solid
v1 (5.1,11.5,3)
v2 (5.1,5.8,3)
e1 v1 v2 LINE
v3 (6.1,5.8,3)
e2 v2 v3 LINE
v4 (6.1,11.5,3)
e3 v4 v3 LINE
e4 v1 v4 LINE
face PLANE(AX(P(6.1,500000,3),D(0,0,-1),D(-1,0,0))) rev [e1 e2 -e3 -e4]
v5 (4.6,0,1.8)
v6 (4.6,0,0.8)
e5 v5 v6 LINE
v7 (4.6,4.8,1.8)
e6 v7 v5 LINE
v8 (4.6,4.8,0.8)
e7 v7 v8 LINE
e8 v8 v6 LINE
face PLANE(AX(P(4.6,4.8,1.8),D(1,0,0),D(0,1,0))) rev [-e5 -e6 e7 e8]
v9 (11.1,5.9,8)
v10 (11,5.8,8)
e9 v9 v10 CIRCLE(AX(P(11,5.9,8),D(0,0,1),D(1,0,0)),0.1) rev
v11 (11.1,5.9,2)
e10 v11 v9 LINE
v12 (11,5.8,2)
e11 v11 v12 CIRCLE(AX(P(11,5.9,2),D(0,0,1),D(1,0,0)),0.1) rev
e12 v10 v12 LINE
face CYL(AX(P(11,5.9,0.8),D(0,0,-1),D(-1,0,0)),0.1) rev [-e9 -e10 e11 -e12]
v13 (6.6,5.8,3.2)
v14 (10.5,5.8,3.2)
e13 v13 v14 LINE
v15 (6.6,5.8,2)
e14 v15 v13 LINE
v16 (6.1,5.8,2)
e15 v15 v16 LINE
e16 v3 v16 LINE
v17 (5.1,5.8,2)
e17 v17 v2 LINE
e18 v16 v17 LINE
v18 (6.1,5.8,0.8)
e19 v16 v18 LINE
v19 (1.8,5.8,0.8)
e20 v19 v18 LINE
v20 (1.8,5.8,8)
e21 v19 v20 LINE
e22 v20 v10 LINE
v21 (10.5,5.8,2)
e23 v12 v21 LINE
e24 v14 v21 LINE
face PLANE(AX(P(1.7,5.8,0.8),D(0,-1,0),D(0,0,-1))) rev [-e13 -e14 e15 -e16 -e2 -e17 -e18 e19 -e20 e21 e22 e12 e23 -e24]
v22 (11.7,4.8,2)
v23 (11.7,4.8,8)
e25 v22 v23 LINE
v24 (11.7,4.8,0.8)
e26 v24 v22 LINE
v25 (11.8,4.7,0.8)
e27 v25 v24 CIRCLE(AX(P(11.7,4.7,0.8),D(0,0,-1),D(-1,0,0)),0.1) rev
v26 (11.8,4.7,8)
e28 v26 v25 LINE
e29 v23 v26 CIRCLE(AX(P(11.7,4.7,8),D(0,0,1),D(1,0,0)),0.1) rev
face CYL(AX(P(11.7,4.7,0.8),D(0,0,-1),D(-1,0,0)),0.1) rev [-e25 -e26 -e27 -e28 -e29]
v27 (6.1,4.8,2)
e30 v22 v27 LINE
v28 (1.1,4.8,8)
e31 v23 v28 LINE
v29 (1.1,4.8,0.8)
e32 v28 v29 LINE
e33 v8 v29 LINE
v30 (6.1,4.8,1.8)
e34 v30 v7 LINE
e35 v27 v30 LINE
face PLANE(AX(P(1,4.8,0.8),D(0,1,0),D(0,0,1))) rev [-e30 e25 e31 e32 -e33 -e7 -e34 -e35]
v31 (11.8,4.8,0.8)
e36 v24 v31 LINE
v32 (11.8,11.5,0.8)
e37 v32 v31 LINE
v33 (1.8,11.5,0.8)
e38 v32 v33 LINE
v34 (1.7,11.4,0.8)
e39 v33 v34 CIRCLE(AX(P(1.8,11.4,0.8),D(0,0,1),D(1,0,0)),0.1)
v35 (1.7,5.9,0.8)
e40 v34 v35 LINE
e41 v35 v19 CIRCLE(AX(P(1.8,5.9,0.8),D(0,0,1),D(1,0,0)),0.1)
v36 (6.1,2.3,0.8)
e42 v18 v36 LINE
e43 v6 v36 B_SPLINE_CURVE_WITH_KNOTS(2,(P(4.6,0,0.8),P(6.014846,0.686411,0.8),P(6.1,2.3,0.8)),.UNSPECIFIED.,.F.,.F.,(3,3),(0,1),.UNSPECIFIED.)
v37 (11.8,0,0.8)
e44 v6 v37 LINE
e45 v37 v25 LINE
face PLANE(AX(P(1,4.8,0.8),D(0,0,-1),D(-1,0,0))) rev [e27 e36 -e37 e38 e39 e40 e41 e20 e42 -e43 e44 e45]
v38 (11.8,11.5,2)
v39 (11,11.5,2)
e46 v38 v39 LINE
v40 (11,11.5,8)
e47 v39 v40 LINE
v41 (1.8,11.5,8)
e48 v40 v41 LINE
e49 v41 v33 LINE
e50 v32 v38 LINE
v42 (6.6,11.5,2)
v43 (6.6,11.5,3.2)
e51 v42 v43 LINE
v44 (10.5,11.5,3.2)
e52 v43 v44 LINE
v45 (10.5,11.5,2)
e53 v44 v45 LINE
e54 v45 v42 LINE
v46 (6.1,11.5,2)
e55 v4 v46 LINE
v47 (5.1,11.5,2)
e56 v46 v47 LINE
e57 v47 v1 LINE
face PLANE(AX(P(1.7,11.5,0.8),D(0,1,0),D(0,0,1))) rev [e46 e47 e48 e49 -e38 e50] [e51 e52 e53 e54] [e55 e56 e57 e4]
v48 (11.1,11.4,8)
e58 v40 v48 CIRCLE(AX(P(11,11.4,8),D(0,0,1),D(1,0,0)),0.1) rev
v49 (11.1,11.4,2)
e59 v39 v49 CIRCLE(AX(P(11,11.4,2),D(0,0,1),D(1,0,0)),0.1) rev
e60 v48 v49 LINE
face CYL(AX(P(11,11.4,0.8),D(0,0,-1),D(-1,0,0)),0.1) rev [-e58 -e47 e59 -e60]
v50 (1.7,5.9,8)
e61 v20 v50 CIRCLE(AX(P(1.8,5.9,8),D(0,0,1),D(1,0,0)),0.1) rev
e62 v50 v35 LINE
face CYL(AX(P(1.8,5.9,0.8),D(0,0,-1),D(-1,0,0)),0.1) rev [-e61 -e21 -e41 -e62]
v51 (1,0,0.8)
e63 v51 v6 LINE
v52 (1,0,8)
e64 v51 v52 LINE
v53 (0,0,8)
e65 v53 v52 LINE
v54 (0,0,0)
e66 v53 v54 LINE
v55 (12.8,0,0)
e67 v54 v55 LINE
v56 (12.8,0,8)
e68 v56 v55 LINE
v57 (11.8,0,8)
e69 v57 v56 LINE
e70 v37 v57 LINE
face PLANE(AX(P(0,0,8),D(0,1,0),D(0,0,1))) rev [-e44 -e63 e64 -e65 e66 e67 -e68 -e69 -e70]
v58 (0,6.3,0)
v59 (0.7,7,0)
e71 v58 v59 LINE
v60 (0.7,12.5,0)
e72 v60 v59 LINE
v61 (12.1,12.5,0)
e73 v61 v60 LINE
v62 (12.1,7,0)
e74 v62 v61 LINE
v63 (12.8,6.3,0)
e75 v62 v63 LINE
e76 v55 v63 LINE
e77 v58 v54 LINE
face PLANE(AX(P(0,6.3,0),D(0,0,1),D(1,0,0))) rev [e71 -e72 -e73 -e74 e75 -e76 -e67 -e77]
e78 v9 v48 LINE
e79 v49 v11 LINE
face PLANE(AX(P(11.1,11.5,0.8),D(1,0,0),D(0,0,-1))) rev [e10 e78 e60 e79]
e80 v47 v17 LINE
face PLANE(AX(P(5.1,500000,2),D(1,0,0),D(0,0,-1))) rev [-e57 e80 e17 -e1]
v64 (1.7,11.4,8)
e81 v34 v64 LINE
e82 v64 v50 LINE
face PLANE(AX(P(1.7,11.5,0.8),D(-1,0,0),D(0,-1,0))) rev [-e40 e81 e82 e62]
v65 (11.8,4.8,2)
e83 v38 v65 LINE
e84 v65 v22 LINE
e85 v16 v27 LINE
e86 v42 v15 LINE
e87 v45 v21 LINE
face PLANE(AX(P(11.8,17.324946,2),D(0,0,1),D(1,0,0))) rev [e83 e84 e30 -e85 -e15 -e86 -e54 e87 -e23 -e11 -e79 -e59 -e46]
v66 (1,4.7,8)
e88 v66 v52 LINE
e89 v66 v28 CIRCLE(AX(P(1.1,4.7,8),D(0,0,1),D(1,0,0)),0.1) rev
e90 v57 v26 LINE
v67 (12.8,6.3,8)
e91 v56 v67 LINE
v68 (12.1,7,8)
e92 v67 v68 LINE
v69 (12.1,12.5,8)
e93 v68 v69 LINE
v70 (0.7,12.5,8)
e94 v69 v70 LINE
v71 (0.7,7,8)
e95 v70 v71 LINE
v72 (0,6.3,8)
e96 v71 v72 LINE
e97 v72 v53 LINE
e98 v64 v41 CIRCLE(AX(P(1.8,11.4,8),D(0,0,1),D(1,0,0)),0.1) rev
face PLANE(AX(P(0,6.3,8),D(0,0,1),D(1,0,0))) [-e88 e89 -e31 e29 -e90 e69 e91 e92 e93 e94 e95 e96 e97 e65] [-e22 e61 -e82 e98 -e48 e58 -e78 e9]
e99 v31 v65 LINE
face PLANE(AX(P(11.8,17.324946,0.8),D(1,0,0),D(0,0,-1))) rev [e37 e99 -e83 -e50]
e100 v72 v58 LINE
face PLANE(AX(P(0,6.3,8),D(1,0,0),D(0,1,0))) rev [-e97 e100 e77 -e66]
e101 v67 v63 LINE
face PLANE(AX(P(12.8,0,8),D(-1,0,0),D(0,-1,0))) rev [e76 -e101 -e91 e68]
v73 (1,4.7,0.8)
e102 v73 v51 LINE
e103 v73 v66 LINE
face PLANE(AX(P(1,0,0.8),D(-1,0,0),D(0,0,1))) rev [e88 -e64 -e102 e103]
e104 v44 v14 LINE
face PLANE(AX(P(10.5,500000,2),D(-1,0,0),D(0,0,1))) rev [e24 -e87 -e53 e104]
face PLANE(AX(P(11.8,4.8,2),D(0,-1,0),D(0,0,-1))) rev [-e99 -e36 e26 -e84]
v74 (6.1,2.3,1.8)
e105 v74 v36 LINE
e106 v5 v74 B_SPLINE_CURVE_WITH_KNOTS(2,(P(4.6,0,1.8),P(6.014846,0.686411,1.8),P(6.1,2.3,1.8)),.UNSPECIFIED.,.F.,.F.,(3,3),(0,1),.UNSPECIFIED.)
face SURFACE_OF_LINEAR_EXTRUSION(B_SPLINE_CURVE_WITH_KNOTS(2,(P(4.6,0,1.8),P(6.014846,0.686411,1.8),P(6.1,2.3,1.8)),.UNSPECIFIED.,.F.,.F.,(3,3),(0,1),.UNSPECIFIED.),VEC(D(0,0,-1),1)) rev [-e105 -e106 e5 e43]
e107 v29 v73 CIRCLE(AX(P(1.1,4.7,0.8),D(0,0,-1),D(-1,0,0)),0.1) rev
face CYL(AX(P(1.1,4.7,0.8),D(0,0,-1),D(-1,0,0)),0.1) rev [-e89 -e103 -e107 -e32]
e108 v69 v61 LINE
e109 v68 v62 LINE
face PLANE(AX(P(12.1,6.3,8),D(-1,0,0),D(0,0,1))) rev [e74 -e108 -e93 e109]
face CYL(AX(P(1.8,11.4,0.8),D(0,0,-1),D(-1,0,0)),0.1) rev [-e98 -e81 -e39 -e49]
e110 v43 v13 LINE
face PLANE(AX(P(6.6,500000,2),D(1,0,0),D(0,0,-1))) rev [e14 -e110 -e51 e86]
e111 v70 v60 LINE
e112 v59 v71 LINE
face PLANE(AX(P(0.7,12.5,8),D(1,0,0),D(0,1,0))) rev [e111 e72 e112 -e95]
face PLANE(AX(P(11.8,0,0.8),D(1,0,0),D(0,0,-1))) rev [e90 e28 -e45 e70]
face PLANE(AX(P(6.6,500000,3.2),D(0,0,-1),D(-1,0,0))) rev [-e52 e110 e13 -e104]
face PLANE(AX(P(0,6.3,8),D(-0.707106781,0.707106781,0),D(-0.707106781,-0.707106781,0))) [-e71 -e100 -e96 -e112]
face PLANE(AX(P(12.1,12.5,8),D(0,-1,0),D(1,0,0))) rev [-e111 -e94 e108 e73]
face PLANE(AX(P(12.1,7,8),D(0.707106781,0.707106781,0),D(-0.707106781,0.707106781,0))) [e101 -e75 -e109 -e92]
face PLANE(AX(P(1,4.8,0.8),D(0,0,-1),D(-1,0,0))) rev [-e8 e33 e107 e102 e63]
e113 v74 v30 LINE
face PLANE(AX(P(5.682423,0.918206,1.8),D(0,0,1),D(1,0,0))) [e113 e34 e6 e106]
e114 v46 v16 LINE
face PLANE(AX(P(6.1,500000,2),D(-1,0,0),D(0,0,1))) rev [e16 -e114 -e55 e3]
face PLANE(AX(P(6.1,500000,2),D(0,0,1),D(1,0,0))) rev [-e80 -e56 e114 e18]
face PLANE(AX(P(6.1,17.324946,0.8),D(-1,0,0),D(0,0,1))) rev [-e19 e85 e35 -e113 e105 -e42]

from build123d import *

# Parameters (mm, degrees)
EXTRUDE_1_DEPTH     = 8
CHAMFER_1_SIZE      = 0.7
SKETCH_3_W          = 10.8
SKETCH_3_H          = 4.8
SKETCH_3_W_2        = 9.4
SKETCH_3_H_2        = 5.7
CUT_EXTRUDE_1_DEPTH = 7.2
FILLET_1_R          = 0.1
CUT_EXTRUDE_2_REACH = 18.945
SKETCH_4_W          = 5.7
SKETCH_4_H          = 1.2
EXTRUDE_2_REACH     = 18.515
SKETCH_5_W          = 3.9
SKETCH_5_H          = 1.2
EXTRUDE_3_DEPTH     = 1
EXTRUDE_4_REACH     = 18.515
SKETCH_7_W          = 1
SKETCH_7_H          = 1


with BuildPart() as part:
    # ｽｹｯﾁ1 → ﾎﾞｽ - 押し出し1 (new body)
    with BuildSketch(Plane.XY):
        Polygon((0, 6.3), (0, 0), (12.8, 0), (12.8, 6.3), (12.1, 6.3), (12.1, 12.5), (0.7, 12.5), (0.7, 6.3), align=None)
    extrude(amount=EXTRUDE_1_DEPTH)

    # 面取り1
    chamfer_1_edges = [part.edges().sort_by_distance(p)[0] for p in [
        (0.7, 6.3, 4),
        (12.1, 6.3, 4),
    ]]
    chamfer(chamfer_1_edges, length=CHAMFER_1_SIZE - 0.0001)  # a hair under: the kernel refuses the full size

    # ｽｹｯﾁ3 → ｶｯﾄ - 押し出し1 (cut)
    with BuildSketch(Plane.XY.offset(8)):
        with Locations((6.4, 2.4)):
            Rectangle(SKETCH_3_W, SKETCH_3_H)
        with Locations((6.4, 8.65)):
            Rectangle(SKETCH_3_W_2, SKETCH_3_H_2)
    extrude(amount=-CUT_EXTRUDE_1_DEPTH, mode=Mode.SUBTRACT)

    # ﾌｨﾚｯﾄ1
    fillet_1_edges = [part.edges().sort_by_distance(p)[0] for p in [
        (1, 4.8, 4.4),
        (11.8, 4.8, 4.4),
        (11.1, 11.5, 4.4),
        (11.1, 5.8, 4.4),
        (1.7, 5.8, 4.4),
        (1.7, 11.5, 4.4),
    ]]
    fillet(fillet_1_edges, radius=FILLET_1_R)

    # ｶｯﾄ - 押し出し2: up to this face of the body (flat: up to its plane)
    cut_extrude_2_end = Plane(part.part.faces().sort_by_distance((6.4, 11.5, 4.4))[0])
    # ｽｹｯﾁ4 → ｶｯﾄ - 押し出し2 (cut, up to the picked face)
    with BuildSketch(Plane.XZ.offset(-4.8), mode=Mode.PRIVATE) as cut_extrude_2_sk1:
        with Locations((8.95, 1.4)):
            Rectangle(SKETCH_4_W, SKETCH_4_H)
    cut_extrude_2_tool1 = split(extrude(cut_extrude_2_sk1.sketch, amount=-CUT_EXTRUDE_2_REACH, mode=Mode.PRIVATE), bisect_by=cut_extrude_2_end, keep=Keep.BOTH, mode=Mode.PRIVATE)
    add(cut_extrude_2_tool1.solids().sort_by(Axis((8.95, 4.8, 1.4), (0, 1, 0)))[0], mode=Mode.SUBTRACT)

    # ｽｹｯﾁ5 → ﾎﾞｽ - 押し出し2 (add, up to next)
    with BuildSketch(Plane(origin=(0, 5.8, 0), x_dir=(1, 0, 0), z_dir=(0, 1, 0)), mode=Mode.PRIVATE) as extrude_2_sk1:
        with Locations((8.55, -2.6)):
            Rectangle(SKETCH_5_W, SKETCH_5_H)
    extrude_2_tool1 = extrude(extrude_2_sk1.sketch, amount=EXTRUDE_2_REACH, mode=Mode.PRIVATE) - part.part
    add(extrude_2_tool1.solids().sort_by_distance((8.55, 5.8, 2.6))[0])

    # ｽｹｯﾁ6 → ﾎﾞｽ - 押し出し3 (add)
    with BuildSketch(Plane.XY.offset(0.8)):
        with BuildLine():
            Line((4.6, 4.8), (4.6, 0))
            add(Edge.make_bspline(
                [(6.1, 2.3), (6.014846431, 0.686411096), (4.6, 0)],
                knots=[0, 0, 0, 1, 1, 1], degree=2))
            Line((6.1, 2.3), (6.1, 4.8))
            Line((6.1, 4.8), (4.6, 4.8))
        make_face()
    extrude(amount=EXTRUDE_3_DEPTH)

    # ｽｹｯﾁ7 → ﾎﾞｽ - 押し出し4 (add, up to next)
    with BuildSketch(Plane(origin=(0, 5.8, 0), x_dir=(1, 0, 0), z_dir=(0, 1, 0)), mode=Mode.PRIVATE) as extrude_4_sk1:
        with Locations((5.6, -2.5)):
            Rectangle(SKETCH_7_W, SKETCH_7_H)
    extrude_4_tool1 = extrude(extrude_4_sk1.sketch, amount=EXTRUDE_4_REACH, mode=Mode.PRIVATE) - part.part
    add(extrude_4_tool1.solids().sort_by_distance((5.6, 5.8, 2.5))[0])


solid = part.part
